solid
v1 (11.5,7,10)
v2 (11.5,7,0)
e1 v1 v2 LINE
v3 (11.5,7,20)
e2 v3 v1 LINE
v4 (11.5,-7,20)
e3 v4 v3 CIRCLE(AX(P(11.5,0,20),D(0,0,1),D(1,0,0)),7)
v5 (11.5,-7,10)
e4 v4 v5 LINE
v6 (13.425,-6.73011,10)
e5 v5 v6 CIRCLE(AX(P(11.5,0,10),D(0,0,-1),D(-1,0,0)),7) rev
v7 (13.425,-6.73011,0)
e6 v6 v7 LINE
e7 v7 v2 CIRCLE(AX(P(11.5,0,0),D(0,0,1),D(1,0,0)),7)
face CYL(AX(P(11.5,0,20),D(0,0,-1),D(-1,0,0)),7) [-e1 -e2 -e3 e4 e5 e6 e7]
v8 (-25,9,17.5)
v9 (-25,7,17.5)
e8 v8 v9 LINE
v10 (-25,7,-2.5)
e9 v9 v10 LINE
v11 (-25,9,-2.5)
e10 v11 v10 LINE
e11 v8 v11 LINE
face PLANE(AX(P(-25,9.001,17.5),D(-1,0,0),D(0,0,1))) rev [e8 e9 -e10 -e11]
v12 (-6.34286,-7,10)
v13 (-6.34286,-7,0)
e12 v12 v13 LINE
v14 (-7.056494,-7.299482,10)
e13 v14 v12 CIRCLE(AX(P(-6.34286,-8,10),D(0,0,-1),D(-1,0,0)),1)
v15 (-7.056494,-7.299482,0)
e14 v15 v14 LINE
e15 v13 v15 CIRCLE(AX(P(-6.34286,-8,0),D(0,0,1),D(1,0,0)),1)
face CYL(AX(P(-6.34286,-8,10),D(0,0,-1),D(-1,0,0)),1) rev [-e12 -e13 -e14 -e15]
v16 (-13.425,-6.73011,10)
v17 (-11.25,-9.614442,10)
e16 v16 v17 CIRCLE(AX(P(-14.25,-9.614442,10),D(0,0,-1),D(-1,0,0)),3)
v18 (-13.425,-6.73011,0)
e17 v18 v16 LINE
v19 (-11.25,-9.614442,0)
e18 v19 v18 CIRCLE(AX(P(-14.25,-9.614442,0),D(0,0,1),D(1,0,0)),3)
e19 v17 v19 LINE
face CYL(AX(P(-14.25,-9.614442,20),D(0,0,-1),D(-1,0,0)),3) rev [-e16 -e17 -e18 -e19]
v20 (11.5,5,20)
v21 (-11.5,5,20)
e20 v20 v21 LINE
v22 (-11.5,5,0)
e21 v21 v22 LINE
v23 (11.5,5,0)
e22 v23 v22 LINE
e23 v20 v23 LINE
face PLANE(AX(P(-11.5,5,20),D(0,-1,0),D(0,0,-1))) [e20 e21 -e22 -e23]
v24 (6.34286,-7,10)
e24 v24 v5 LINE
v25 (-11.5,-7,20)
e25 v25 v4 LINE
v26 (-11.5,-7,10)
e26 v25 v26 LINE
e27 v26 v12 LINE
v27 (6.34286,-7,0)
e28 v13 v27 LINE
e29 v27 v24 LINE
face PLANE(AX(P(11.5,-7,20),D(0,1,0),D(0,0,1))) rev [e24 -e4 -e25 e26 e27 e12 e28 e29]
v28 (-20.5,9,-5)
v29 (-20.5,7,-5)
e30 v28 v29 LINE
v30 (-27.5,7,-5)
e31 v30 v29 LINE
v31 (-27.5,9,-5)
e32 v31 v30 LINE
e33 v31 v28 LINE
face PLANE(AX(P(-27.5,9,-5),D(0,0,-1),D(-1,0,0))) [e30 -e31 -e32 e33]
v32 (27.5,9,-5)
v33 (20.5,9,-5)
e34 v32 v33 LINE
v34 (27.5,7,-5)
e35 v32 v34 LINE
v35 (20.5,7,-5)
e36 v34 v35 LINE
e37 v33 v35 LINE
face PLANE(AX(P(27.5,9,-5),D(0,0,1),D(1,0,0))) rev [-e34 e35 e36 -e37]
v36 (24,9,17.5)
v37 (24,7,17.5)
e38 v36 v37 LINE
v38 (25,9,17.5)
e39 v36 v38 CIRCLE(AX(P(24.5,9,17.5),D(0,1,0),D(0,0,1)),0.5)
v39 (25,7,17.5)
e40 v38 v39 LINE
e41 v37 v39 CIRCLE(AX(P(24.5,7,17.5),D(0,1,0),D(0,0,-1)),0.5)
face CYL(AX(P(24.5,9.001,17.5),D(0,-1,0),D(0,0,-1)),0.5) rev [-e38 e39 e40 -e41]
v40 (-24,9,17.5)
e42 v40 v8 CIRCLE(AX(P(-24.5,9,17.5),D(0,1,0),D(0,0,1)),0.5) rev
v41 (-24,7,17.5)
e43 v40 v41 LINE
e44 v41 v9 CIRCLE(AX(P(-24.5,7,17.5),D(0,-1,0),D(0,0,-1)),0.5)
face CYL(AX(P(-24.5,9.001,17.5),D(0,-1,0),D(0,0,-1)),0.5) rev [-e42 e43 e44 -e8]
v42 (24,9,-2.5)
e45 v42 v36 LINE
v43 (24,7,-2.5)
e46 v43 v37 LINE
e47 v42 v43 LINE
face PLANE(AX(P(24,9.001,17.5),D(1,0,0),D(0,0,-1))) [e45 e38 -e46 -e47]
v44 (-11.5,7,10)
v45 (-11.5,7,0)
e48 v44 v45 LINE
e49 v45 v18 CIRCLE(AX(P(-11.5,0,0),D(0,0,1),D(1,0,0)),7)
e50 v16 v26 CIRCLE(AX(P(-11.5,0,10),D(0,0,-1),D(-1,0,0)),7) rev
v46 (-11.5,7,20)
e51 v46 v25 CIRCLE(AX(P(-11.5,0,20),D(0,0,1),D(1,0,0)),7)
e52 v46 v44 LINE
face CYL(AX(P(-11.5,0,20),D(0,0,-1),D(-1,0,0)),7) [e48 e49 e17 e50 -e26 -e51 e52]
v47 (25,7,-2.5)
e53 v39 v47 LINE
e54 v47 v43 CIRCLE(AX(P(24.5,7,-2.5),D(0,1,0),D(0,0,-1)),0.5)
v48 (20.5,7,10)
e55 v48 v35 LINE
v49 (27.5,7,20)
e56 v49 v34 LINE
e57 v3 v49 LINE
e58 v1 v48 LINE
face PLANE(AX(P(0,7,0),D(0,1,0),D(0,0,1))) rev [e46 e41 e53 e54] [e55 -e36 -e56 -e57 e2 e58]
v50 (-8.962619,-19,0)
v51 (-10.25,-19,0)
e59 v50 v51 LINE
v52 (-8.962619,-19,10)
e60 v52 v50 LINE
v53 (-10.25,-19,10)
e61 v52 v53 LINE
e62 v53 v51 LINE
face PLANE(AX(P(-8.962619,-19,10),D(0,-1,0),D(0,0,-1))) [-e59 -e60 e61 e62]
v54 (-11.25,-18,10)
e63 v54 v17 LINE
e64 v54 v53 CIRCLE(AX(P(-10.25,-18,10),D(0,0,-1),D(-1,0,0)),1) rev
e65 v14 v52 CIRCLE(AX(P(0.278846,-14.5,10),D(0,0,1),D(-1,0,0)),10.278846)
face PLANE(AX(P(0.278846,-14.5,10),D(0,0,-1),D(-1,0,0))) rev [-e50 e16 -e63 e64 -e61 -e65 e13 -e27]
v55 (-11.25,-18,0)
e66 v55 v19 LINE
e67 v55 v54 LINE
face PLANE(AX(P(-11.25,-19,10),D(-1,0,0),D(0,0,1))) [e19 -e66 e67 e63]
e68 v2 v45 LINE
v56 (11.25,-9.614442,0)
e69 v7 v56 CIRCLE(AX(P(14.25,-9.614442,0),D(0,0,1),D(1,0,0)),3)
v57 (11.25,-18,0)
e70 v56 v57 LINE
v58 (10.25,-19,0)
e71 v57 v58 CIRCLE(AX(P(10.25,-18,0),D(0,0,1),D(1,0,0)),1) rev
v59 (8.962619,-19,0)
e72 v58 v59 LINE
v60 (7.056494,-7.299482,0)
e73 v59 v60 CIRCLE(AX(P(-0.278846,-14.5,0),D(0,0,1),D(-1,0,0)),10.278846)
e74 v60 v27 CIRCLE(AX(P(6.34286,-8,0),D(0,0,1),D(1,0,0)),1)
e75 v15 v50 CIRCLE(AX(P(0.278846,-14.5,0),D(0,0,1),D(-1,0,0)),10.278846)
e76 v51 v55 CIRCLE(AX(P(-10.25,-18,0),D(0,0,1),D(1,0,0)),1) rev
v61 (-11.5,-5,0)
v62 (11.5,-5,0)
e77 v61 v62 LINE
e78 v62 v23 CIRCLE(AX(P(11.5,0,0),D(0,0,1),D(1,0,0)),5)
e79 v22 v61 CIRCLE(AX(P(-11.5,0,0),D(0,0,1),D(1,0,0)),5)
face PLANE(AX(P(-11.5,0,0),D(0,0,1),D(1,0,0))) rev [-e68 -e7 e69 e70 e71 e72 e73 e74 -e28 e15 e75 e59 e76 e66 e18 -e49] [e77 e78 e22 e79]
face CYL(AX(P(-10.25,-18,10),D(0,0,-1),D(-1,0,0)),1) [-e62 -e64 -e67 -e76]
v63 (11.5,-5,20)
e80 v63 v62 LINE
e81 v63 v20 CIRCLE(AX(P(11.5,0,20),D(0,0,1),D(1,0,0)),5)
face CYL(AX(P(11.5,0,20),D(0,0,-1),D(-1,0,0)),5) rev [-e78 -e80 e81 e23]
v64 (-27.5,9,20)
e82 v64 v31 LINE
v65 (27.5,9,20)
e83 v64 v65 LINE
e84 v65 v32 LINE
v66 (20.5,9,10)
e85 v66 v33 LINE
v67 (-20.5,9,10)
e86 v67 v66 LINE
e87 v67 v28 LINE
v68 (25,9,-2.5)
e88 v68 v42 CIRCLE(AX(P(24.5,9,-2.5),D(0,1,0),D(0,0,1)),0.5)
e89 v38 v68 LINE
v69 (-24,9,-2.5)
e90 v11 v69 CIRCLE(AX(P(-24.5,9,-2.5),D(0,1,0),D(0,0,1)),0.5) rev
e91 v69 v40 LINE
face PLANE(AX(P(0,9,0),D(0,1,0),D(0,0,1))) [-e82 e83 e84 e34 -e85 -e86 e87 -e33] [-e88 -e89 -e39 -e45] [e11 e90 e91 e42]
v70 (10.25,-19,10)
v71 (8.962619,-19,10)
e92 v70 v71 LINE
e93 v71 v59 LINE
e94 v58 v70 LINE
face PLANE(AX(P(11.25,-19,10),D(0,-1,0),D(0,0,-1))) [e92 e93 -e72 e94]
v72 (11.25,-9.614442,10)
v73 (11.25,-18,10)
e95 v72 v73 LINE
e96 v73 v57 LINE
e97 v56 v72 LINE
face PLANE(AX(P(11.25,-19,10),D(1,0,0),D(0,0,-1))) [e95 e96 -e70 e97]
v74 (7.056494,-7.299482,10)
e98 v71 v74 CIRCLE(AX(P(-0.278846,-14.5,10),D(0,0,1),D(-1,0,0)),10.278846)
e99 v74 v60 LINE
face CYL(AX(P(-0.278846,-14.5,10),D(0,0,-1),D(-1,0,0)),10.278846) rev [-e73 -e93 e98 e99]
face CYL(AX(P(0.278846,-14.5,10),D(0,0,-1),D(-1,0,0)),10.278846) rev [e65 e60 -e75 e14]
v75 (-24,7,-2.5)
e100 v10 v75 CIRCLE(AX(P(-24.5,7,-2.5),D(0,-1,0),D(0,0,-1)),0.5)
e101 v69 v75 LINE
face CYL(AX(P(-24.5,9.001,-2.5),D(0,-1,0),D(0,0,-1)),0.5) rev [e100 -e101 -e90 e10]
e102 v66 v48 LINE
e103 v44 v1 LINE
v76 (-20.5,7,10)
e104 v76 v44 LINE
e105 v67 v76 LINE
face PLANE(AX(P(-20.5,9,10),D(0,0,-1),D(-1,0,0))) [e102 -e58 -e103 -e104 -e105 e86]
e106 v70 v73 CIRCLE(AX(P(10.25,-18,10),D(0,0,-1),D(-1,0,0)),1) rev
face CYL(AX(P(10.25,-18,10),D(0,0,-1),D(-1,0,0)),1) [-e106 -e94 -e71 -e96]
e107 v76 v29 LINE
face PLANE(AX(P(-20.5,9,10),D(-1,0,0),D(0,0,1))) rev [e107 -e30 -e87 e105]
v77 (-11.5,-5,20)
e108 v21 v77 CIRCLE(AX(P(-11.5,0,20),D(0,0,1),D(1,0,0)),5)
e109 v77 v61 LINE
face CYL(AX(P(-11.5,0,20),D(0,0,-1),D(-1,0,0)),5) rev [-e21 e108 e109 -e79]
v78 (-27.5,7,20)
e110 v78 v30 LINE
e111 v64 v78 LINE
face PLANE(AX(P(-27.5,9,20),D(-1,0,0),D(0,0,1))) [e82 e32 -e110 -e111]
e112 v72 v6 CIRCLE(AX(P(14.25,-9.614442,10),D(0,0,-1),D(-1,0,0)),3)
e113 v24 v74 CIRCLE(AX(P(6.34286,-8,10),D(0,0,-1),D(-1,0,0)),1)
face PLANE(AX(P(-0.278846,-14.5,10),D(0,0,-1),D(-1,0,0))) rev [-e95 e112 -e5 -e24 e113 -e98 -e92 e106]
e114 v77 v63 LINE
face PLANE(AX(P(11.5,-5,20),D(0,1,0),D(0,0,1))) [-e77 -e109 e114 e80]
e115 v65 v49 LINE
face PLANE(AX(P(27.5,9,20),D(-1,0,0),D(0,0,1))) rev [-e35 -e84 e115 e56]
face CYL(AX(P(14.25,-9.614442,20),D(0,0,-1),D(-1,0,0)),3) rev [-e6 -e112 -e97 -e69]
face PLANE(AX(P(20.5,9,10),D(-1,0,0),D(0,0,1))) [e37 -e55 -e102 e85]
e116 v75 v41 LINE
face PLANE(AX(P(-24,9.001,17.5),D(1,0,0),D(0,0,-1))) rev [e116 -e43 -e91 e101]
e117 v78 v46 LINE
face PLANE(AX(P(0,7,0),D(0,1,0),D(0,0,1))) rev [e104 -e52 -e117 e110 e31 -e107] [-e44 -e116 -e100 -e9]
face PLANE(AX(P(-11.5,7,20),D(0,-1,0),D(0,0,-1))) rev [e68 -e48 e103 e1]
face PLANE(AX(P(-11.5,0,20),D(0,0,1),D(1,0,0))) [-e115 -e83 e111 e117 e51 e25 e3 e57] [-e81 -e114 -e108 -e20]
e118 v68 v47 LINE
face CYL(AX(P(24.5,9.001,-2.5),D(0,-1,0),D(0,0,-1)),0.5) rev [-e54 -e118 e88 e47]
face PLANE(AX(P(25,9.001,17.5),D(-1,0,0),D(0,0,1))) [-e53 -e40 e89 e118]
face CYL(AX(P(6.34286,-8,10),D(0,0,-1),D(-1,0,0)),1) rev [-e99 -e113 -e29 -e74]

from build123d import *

# Parameters (mm, degrees)
BOSS_EXTRUDE1_DEPTH = 20
BOSS_EXTRUDE2_DEPTH = 10
FILLET1_R           = 3
FILLET2_R           = 1
BOSS_EXTRUDE4_DEPTH = 2
CUT_EXTRUDE1_REACH  = 44.805


with BuildPart() as part:
    # Sketch1 → Boss-Extrude1 (new body)
    with BuildSketch(Plane.XY):
        with BuildLine():
            Line((-11.5, 7), (11.5, 7))
            ThreePointArc((11.5, 7), (18.5, 0), (11.5, -7))
            Line((11.5, -7), (-11.5, -7))
            ThreePointArc((-11.5, -7), (-18.5, 0), (-11.5, 7))
        make_face()
        with BuildLine():
            Line((-11.5, 5), (11.5, 5))
            ThreePointArc((11.5, 5), (16.5, 0), (11.5, -5))
            Line((11.5, -5), (-11.5, -5))
            ThreePointArc((-11.5, -5), (-16.5, 0), (-11.5, 5))
        make_face(mode=Mode.SUBTRACT)
    extrude(amount=BOSS_EXTRUDE1_DEPTH)

    # Sketch2 → Boss-Extrude2 (add)
    with BuildSketch(Plane(origin=(0, 0, 0), x_dir=(-1, 0, 0), z_dir=(0, 0, -1))):
        with BuildLine():
            Line((11.25, -7), (6.75, -7))
            ThreePointArc((6.75, -7), (9.829603655, -12.636154321), (8.962619003, -19))
            Line((8.962619003, -19), (11.25, -19))
            Line((11.25, -19), (11.25, -7))
        make_face()
        with BuildLine():
            Line((-11.25, -19), (-8.962619003, -19))
            ThreePointArc((-8.962619003, -19), (-9.829603655, -12.636154321), (-6.75, -7))
            Line((-6.75, -7), (-11.25, -7))
            Line((-11.25, -7), (-11.25, -19))
        make_face()
    extrude(amount=-BOSS_EXTRUDE2_DEPTH)

    # Fillet1
    # the kernel refuses this fillet: 3 mm, written as the material it adds along each edge
    with BuildSketch(Plane(origin=(-11.25, -7, 0), x_dir=(-0.9923889232111901, 0.12314310816174315, 0), z_dir=(0, 0, 1))) as fillet1_piece_1:
        with BuildLine():
            CenterArc((2.655216223, 2.963972865), FILLET1_R, 187.073535236, 74.037985837)
            Line((-0.321950546, 2.594543541), (-0.619667223, 2.557600608))
            Line((-0.619667223, 2.557600608), (-0.297716677, -0.036942932))
            Line((-0.297716677, -0.036942932), (0.036942932, -0.297716677))
            ThreePointArc((0.036942932, -0.297716677), (0.285040163, -0.2669309), (2.145327536, -0.296397287))
            Line((2.145327536, -0.296397287), (2.191681053, 0))
        make_face()
    extrude(amount=10)
    with BuildSketch(Plane(origin=(11.25, -7, 0), x_dir=(0.9923889232111899, 0.12314310816174322, 0), z_dir=(0, 0, 1))) as fillet1_piece_2:
        with BuildLine():
            CenterArc((2.655216223, -2.963972865), FILLET1_R, 98.888478927, 74.037985837)
            Line((-0.321950546, -2.594543541), (-0.619667223, -2.557600608))
            Line((-0.619667223, -2.557600608), (-0.297716677, 0.036942932))
            Line((-0.297716677, 0.036942932), (0.036942932, 0.297716677))
            ThreePointArc((0.036942932, 0.297716677), (0.285040163, 0.2669309), (2.145327536, 0.296397287))
            Line((2.145327536, 0.296397287), (2.191681053, 0))
        make_face()
    extrude(amount=10)

    # Fillet2
    fillet2_edges = [part.edges().sort_by_distance(p)[0] for p in [
        (-6.75, -7, 5),
        (-11.25, -19, 5),
        (6.75, -7, 5),
        (11.25, -19, 5),
    ]]
    fillet(fillet2_edges, radius=FILLET2_R)

    # Sketch3 → Boss-Extrude4 (add)
    with BuildSketch(Plane(origin=(0, 7, 0), x_dir=(1, 0, 0), z_dir=(0, 1, 0))):
        Polygon((-27.5, -20), (27.5, -20), (27.5, 5), (20.5, 5), (20.5, -10), (-20.5, -10), (-20.5, 5), (-27.5, 5), align=None)
    extrude(amount=BOSS_EXTRUDE4_DEPTH)

    # Sketch4 → Cut-Extrude1 (cut, up to next)
    with BuildSketch(Plane.XZ.offset(-7), mode=Mode.PRIVATE) as cut_extrude1_sk1:
        with BuildLine():
            Line((-24, 17.5), (-24, -2.5))
            ThreePointArc((-24, -2.5), (-24.5, -3), (-25, -2.5))
            Line((-25, -2.5), (-25, 17.5))
            ThreePointArc((-25, 17.5), (-24.5, 18), (-24, 17.5))
        make_face()
    cut_extrude1_tool1 = extrude(cut_extrude1_sk1.sketch, amount=-CUT_EXTRUDE1_REACH, mode=Mode.PRIVATE) & part.part
    cut_extrude1 = cut_extrude1_tool1.solids().sort_by_distance((-24.5, 7, 7.5))[0]
    add(cut_extrude1, mode=Mode.SUBTRACT)

    # Mirror1: Cut-Extrude1 across plane
    add(cut_extrude1.mirror(Plane(origin=(0, 0, 0), x_dir=(0, 0, 1), z_dir=(1, 0, 0))), mode=Mode.SUBTRACT)


solid = part.part
